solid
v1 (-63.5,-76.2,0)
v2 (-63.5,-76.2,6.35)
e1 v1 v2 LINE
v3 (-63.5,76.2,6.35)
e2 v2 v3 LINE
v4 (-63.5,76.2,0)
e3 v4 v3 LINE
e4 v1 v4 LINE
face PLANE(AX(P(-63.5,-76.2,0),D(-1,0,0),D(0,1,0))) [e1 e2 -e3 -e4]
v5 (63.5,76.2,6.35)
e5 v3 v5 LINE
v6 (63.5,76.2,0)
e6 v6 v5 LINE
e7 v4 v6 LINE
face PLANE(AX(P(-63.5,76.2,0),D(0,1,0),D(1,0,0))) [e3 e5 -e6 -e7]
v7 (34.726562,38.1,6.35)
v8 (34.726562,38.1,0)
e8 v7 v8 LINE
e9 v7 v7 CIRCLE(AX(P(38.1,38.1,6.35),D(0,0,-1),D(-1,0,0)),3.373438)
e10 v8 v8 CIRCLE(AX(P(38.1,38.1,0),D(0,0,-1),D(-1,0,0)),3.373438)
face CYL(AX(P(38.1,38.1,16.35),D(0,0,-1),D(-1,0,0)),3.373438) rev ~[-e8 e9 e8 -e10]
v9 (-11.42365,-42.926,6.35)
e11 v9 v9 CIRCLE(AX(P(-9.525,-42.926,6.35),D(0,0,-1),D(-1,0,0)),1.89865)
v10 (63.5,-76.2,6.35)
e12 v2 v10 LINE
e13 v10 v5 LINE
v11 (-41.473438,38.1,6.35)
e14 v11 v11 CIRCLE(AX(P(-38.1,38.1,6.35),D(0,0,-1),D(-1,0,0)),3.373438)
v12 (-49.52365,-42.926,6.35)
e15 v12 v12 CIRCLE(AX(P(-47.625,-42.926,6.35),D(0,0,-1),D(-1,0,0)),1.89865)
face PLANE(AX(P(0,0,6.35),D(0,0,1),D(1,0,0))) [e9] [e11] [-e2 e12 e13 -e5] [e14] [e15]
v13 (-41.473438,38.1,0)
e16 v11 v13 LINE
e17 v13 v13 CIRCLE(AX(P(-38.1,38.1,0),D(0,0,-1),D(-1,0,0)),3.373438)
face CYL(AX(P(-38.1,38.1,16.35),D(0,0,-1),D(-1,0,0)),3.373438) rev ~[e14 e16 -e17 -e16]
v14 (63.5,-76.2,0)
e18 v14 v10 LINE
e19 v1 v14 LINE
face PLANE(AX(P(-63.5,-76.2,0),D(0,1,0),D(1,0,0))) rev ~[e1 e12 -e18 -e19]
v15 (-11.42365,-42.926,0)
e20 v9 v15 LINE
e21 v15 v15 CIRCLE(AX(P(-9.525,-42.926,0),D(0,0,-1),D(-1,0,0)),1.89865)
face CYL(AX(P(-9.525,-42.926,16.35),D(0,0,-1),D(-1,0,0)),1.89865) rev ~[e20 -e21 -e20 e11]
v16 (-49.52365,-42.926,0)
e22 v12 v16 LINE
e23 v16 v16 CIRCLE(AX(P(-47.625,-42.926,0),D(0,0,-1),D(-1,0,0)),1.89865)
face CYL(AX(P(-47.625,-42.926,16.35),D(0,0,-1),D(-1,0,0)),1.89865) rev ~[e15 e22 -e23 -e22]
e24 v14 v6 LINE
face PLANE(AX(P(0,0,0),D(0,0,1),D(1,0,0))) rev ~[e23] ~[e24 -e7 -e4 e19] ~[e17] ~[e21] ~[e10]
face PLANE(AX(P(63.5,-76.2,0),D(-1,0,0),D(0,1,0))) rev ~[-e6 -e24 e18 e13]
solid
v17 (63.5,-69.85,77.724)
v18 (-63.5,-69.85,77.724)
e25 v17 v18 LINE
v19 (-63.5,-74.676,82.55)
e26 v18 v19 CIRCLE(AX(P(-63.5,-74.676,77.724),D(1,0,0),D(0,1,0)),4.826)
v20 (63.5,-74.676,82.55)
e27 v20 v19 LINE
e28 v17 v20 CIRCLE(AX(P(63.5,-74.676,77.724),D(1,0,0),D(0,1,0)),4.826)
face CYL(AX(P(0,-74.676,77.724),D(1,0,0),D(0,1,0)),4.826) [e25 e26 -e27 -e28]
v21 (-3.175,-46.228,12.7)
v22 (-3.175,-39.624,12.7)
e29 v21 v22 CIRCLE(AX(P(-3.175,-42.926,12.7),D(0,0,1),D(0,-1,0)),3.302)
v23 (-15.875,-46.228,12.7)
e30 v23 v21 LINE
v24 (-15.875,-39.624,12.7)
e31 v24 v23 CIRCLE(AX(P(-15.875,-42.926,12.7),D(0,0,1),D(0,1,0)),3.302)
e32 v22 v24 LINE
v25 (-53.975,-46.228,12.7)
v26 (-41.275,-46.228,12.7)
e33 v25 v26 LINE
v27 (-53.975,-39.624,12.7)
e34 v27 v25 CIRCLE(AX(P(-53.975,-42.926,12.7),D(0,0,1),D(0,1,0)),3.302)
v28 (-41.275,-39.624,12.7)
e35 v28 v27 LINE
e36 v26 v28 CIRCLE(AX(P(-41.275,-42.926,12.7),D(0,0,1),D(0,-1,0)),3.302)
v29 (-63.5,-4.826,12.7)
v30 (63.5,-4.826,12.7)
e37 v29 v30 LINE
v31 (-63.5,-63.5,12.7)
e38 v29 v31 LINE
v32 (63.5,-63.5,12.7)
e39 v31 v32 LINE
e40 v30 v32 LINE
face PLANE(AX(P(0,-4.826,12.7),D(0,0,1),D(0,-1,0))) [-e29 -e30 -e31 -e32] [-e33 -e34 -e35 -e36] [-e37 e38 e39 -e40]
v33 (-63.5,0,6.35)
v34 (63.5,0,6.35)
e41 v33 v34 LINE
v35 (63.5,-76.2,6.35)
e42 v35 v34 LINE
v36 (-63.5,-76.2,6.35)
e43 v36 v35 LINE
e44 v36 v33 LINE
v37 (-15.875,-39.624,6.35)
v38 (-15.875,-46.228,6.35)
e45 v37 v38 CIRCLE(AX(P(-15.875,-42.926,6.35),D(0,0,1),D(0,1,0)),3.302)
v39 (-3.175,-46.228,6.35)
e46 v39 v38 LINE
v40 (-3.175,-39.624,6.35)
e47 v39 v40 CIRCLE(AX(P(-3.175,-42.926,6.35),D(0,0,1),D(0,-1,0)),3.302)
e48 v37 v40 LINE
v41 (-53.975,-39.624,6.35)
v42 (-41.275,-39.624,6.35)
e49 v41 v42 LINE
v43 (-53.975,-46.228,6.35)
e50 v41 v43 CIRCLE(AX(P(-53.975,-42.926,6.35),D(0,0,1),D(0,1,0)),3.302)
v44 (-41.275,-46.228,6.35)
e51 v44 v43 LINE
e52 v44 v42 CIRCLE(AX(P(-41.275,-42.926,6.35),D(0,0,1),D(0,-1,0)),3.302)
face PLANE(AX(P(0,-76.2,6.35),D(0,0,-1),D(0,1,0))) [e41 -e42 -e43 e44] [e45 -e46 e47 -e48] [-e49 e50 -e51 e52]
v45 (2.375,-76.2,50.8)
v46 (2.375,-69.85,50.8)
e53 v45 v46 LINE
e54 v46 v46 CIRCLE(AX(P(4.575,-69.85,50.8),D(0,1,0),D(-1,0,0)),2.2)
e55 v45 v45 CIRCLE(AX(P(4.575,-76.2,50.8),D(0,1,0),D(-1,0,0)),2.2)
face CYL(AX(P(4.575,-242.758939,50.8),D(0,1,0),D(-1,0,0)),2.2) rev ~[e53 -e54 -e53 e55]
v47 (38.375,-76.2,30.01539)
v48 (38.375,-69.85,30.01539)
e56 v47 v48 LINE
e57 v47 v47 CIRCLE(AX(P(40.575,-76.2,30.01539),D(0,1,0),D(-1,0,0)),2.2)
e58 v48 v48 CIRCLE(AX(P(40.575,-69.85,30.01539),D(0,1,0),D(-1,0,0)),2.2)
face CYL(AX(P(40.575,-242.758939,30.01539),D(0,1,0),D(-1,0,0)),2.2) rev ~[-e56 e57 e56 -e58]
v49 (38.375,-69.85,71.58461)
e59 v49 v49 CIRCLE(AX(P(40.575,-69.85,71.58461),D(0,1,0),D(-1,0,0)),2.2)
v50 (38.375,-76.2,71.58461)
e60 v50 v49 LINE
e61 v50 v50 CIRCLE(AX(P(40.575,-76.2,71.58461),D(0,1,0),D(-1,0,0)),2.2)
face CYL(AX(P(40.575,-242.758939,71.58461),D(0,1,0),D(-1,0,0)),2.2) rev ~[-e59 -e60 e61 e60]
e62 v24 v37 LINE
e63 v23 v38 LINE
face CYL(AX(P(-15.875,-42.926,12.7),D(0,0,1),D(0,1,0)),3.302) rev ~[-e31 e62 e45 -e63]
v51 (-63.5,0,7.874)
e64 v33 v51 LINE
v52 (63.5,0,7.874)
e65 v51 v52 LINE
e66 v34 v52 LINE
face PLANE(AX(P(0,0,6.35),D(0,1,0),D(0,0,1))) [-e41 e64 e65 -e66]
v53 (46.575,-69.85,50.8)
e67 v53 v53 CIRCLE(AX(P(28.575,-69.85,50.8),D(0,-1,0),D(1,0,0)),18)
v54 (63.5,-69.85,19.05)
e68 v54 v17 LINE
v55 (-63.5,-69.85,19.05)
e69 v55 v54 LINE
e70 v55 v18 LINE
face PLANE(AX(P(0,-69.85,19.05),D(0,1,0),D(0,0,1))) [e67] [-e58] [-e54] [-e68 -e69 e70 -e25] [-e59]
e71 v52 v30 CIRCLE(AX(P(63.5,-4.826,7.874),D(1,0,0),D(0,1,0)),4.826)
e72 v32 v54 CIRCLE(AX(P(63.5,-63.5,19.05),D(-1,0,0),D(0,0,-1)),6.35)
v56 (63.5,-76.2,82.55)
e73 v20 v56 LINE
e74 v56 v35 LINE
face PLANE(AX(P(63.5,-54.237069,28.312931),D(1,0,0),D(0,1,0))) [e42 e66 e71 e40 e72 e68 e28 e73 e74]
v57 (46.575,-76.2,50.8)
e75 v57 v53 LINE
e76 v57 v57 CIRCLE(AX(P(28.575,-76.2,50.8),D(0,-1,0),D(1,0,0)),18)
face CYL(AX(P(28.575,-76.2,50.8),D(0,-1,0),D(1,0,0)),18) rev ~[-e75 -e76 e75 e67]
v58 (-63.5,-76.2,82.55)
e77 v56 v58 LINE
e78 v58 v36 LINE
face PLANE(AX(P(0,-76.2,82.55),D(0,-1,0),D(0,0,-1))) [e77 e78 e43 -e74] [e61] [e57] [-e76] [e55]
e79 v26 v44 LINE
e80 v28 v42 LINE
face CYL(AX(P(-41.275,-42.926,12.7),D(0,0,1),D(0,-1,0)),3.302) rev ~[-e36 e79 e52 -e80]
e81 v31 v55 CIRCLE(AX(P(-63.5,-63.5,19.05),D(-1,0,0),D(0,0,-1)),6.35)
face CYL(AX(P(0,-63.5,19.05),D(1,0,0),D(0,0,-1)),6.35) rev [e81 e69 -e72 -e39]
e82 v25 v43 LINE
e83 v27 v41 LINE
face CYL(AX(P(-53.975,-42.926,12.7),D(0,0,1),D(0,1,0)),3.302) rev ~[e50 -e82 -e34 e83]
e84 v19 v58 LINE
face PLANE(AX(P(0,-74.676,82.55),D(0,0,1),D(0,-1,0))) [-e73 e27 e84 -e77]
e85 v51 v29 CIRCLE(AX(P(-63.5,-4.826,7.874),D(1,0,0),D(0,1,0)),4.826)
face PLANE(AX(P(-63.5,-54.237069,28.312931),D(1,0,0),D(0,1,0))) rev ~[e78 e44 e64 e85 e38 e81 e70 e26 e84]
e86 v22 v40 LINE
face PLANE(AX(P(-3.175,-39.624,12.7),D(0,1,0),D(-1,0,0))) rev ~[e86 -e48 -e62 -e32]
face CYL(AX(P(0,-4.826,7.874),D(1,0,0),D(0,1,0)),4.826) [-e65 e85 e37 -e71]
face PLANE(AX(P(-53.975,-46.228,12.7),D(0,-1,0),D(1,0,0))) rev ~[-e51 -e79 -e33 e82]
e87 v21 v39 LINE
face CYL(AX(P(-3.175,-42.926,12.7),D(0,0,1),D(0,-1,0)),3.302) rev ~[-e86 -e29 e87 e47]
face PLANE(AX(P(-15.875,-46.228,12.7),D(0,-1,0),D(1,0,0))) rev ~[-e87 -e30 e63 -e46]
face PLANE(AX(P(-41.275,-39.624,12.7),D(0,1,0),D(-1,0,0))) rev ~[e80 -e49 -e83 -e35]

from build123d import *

# Parameters (mm, degrees)
F0_W      = 127
F0_H      = 152.4
F1_DEPTH  = 6.35
F3_D      = 6.746875
F3_DEPTH  = 10
F3_TIP    = 2.0269657445
F5_D      = 3.7973
F5_DEPTH  = 10
F5_TIP    = 1.1408240143
F7_DEPTH  = 63.5
F9_DEPTH  = 12.701
F10_R     = 18
F11_DEPTH = 25
F13_D     = 4.4


# Not quite as in the source:
# - a length typed as a fraction of an inch, garbled in the dataset ("3 / 203.2 mm" for 3/8 in), is restored


with BuildPart() as f1:
    # F0 (on Top) → F1 (new body)
    with BuildSketch(Plane.XY):
        Rectangle(F0_W, F0_H)
    extrude(amount=F1_DEPTH)

    # F3
    with Locations(Plane.XY.offset(6.35)):
        with Locations((-38.1, 38.1), (38.1, 38.1)):
            Hole(F3_D / 2, depth=F3_DEPTH)
            with Locations((0, 0, -(F3_DEPTH + F3_TIP / 2))):  # 118° drill point
                Cone(0, F3_D / 2, F3_TIP, mode=Mode.SUBTRACT)

    # F5
    with Locations(Plane.XY.offset(6.35)):
        with Locations((-47.625, -42.926), (-9.525, -42.926)):
            Hole(F5_D / 2, depth=F5_DEPTH)
            with Locations((0, 0, -(F5_DEPTH + F5_TIP / 2))):  # 118° drill point
                Cone(0, F5_D / 2, F5_TIP, mode=Mode.SUBTRACT)


with BuildPart() as f7:
    # F6 (on Right) → F7 (new body, symmetric)
    with BuildSketch(Plane.YZ):
        with BuildLine():
            Line((-76.2, 82.55), (-76.2, 6.35))
            Line((-76.2, 6.35), (0, 6.35))
            Line((0, 6.35), (0, 7.874))
            ThreePointArc((0, 7.874), (-1.413502674, 11.286497326), (-4.826, 12.7))
            Line((-4.826, 12.7), (-63.5, 12.7))
            ThreePointArc((-63.5, 12.7), (-67.9901280605, 14.5598719395), (-69.85, 19.05))
            Line((-69.85, 19.05), (-69.85, 77.724))
            ThreePointArc((-69.85, 77.724), (-71.263502674, 81.136497326), (-74.676, 82.55))
            Line((-74.676, 82.55), (-76.2, 82.55))
        make_face()
    extrude(amount=F7_DEPTH, both=True)

    # F8 (on face) → F9 (cut, through all)
    with BuildSketch(Plane.XY.offset(12.7)):
        with BuildLine():
            Line((-41.275, -39.624), (-53.975, -39.624))
            ThreePointArc((-53.975, -39.624), (-57.277, -42.926), (-53.975, -46.228))
            Line((-53.975, -46.228), (-41.275, -46.228))
            ThreePointArc((-41.275, -46.228), (-37.973, -42.926), (-41.275, -39.624))
        make_face()
        with BuildLine():
            Line((-3.175, -39.624), (-15.875, -39.624))
            ThreePointArc((-15.875, -39.624), (-19.177, -42.926), (-15.875, -46.228))
            Line((-15.875, -46.228), (-3.175, -46.228))
            ThreePointArc((-3.175, -46.228), (0.127, -42.926), (-3.175, -39.624))
        make_face()
    extrude(amount=-F9_DEPTH, mode=Mode.SUBTRACT)

    # F10 (on face) → F11 (cut)
    with BuildSketch(Plane.XZ.offset(76.2)):
        with Locations((28.575, 50.8)):
            Circle(F10_R)
    extrude(amount=-F11_DEPTH, mode=Mode.SUBTRACT)

    # F13 (through all)
    with Locations(Plane.XZ.offset(76.2)):
        with Locations((4.575, 50.8), (40.575, 71.5846096908), (40.575, 30.0153903092)):
            Hole(F13_D / 2)


solid = Compound([f1.part, f7.part])
